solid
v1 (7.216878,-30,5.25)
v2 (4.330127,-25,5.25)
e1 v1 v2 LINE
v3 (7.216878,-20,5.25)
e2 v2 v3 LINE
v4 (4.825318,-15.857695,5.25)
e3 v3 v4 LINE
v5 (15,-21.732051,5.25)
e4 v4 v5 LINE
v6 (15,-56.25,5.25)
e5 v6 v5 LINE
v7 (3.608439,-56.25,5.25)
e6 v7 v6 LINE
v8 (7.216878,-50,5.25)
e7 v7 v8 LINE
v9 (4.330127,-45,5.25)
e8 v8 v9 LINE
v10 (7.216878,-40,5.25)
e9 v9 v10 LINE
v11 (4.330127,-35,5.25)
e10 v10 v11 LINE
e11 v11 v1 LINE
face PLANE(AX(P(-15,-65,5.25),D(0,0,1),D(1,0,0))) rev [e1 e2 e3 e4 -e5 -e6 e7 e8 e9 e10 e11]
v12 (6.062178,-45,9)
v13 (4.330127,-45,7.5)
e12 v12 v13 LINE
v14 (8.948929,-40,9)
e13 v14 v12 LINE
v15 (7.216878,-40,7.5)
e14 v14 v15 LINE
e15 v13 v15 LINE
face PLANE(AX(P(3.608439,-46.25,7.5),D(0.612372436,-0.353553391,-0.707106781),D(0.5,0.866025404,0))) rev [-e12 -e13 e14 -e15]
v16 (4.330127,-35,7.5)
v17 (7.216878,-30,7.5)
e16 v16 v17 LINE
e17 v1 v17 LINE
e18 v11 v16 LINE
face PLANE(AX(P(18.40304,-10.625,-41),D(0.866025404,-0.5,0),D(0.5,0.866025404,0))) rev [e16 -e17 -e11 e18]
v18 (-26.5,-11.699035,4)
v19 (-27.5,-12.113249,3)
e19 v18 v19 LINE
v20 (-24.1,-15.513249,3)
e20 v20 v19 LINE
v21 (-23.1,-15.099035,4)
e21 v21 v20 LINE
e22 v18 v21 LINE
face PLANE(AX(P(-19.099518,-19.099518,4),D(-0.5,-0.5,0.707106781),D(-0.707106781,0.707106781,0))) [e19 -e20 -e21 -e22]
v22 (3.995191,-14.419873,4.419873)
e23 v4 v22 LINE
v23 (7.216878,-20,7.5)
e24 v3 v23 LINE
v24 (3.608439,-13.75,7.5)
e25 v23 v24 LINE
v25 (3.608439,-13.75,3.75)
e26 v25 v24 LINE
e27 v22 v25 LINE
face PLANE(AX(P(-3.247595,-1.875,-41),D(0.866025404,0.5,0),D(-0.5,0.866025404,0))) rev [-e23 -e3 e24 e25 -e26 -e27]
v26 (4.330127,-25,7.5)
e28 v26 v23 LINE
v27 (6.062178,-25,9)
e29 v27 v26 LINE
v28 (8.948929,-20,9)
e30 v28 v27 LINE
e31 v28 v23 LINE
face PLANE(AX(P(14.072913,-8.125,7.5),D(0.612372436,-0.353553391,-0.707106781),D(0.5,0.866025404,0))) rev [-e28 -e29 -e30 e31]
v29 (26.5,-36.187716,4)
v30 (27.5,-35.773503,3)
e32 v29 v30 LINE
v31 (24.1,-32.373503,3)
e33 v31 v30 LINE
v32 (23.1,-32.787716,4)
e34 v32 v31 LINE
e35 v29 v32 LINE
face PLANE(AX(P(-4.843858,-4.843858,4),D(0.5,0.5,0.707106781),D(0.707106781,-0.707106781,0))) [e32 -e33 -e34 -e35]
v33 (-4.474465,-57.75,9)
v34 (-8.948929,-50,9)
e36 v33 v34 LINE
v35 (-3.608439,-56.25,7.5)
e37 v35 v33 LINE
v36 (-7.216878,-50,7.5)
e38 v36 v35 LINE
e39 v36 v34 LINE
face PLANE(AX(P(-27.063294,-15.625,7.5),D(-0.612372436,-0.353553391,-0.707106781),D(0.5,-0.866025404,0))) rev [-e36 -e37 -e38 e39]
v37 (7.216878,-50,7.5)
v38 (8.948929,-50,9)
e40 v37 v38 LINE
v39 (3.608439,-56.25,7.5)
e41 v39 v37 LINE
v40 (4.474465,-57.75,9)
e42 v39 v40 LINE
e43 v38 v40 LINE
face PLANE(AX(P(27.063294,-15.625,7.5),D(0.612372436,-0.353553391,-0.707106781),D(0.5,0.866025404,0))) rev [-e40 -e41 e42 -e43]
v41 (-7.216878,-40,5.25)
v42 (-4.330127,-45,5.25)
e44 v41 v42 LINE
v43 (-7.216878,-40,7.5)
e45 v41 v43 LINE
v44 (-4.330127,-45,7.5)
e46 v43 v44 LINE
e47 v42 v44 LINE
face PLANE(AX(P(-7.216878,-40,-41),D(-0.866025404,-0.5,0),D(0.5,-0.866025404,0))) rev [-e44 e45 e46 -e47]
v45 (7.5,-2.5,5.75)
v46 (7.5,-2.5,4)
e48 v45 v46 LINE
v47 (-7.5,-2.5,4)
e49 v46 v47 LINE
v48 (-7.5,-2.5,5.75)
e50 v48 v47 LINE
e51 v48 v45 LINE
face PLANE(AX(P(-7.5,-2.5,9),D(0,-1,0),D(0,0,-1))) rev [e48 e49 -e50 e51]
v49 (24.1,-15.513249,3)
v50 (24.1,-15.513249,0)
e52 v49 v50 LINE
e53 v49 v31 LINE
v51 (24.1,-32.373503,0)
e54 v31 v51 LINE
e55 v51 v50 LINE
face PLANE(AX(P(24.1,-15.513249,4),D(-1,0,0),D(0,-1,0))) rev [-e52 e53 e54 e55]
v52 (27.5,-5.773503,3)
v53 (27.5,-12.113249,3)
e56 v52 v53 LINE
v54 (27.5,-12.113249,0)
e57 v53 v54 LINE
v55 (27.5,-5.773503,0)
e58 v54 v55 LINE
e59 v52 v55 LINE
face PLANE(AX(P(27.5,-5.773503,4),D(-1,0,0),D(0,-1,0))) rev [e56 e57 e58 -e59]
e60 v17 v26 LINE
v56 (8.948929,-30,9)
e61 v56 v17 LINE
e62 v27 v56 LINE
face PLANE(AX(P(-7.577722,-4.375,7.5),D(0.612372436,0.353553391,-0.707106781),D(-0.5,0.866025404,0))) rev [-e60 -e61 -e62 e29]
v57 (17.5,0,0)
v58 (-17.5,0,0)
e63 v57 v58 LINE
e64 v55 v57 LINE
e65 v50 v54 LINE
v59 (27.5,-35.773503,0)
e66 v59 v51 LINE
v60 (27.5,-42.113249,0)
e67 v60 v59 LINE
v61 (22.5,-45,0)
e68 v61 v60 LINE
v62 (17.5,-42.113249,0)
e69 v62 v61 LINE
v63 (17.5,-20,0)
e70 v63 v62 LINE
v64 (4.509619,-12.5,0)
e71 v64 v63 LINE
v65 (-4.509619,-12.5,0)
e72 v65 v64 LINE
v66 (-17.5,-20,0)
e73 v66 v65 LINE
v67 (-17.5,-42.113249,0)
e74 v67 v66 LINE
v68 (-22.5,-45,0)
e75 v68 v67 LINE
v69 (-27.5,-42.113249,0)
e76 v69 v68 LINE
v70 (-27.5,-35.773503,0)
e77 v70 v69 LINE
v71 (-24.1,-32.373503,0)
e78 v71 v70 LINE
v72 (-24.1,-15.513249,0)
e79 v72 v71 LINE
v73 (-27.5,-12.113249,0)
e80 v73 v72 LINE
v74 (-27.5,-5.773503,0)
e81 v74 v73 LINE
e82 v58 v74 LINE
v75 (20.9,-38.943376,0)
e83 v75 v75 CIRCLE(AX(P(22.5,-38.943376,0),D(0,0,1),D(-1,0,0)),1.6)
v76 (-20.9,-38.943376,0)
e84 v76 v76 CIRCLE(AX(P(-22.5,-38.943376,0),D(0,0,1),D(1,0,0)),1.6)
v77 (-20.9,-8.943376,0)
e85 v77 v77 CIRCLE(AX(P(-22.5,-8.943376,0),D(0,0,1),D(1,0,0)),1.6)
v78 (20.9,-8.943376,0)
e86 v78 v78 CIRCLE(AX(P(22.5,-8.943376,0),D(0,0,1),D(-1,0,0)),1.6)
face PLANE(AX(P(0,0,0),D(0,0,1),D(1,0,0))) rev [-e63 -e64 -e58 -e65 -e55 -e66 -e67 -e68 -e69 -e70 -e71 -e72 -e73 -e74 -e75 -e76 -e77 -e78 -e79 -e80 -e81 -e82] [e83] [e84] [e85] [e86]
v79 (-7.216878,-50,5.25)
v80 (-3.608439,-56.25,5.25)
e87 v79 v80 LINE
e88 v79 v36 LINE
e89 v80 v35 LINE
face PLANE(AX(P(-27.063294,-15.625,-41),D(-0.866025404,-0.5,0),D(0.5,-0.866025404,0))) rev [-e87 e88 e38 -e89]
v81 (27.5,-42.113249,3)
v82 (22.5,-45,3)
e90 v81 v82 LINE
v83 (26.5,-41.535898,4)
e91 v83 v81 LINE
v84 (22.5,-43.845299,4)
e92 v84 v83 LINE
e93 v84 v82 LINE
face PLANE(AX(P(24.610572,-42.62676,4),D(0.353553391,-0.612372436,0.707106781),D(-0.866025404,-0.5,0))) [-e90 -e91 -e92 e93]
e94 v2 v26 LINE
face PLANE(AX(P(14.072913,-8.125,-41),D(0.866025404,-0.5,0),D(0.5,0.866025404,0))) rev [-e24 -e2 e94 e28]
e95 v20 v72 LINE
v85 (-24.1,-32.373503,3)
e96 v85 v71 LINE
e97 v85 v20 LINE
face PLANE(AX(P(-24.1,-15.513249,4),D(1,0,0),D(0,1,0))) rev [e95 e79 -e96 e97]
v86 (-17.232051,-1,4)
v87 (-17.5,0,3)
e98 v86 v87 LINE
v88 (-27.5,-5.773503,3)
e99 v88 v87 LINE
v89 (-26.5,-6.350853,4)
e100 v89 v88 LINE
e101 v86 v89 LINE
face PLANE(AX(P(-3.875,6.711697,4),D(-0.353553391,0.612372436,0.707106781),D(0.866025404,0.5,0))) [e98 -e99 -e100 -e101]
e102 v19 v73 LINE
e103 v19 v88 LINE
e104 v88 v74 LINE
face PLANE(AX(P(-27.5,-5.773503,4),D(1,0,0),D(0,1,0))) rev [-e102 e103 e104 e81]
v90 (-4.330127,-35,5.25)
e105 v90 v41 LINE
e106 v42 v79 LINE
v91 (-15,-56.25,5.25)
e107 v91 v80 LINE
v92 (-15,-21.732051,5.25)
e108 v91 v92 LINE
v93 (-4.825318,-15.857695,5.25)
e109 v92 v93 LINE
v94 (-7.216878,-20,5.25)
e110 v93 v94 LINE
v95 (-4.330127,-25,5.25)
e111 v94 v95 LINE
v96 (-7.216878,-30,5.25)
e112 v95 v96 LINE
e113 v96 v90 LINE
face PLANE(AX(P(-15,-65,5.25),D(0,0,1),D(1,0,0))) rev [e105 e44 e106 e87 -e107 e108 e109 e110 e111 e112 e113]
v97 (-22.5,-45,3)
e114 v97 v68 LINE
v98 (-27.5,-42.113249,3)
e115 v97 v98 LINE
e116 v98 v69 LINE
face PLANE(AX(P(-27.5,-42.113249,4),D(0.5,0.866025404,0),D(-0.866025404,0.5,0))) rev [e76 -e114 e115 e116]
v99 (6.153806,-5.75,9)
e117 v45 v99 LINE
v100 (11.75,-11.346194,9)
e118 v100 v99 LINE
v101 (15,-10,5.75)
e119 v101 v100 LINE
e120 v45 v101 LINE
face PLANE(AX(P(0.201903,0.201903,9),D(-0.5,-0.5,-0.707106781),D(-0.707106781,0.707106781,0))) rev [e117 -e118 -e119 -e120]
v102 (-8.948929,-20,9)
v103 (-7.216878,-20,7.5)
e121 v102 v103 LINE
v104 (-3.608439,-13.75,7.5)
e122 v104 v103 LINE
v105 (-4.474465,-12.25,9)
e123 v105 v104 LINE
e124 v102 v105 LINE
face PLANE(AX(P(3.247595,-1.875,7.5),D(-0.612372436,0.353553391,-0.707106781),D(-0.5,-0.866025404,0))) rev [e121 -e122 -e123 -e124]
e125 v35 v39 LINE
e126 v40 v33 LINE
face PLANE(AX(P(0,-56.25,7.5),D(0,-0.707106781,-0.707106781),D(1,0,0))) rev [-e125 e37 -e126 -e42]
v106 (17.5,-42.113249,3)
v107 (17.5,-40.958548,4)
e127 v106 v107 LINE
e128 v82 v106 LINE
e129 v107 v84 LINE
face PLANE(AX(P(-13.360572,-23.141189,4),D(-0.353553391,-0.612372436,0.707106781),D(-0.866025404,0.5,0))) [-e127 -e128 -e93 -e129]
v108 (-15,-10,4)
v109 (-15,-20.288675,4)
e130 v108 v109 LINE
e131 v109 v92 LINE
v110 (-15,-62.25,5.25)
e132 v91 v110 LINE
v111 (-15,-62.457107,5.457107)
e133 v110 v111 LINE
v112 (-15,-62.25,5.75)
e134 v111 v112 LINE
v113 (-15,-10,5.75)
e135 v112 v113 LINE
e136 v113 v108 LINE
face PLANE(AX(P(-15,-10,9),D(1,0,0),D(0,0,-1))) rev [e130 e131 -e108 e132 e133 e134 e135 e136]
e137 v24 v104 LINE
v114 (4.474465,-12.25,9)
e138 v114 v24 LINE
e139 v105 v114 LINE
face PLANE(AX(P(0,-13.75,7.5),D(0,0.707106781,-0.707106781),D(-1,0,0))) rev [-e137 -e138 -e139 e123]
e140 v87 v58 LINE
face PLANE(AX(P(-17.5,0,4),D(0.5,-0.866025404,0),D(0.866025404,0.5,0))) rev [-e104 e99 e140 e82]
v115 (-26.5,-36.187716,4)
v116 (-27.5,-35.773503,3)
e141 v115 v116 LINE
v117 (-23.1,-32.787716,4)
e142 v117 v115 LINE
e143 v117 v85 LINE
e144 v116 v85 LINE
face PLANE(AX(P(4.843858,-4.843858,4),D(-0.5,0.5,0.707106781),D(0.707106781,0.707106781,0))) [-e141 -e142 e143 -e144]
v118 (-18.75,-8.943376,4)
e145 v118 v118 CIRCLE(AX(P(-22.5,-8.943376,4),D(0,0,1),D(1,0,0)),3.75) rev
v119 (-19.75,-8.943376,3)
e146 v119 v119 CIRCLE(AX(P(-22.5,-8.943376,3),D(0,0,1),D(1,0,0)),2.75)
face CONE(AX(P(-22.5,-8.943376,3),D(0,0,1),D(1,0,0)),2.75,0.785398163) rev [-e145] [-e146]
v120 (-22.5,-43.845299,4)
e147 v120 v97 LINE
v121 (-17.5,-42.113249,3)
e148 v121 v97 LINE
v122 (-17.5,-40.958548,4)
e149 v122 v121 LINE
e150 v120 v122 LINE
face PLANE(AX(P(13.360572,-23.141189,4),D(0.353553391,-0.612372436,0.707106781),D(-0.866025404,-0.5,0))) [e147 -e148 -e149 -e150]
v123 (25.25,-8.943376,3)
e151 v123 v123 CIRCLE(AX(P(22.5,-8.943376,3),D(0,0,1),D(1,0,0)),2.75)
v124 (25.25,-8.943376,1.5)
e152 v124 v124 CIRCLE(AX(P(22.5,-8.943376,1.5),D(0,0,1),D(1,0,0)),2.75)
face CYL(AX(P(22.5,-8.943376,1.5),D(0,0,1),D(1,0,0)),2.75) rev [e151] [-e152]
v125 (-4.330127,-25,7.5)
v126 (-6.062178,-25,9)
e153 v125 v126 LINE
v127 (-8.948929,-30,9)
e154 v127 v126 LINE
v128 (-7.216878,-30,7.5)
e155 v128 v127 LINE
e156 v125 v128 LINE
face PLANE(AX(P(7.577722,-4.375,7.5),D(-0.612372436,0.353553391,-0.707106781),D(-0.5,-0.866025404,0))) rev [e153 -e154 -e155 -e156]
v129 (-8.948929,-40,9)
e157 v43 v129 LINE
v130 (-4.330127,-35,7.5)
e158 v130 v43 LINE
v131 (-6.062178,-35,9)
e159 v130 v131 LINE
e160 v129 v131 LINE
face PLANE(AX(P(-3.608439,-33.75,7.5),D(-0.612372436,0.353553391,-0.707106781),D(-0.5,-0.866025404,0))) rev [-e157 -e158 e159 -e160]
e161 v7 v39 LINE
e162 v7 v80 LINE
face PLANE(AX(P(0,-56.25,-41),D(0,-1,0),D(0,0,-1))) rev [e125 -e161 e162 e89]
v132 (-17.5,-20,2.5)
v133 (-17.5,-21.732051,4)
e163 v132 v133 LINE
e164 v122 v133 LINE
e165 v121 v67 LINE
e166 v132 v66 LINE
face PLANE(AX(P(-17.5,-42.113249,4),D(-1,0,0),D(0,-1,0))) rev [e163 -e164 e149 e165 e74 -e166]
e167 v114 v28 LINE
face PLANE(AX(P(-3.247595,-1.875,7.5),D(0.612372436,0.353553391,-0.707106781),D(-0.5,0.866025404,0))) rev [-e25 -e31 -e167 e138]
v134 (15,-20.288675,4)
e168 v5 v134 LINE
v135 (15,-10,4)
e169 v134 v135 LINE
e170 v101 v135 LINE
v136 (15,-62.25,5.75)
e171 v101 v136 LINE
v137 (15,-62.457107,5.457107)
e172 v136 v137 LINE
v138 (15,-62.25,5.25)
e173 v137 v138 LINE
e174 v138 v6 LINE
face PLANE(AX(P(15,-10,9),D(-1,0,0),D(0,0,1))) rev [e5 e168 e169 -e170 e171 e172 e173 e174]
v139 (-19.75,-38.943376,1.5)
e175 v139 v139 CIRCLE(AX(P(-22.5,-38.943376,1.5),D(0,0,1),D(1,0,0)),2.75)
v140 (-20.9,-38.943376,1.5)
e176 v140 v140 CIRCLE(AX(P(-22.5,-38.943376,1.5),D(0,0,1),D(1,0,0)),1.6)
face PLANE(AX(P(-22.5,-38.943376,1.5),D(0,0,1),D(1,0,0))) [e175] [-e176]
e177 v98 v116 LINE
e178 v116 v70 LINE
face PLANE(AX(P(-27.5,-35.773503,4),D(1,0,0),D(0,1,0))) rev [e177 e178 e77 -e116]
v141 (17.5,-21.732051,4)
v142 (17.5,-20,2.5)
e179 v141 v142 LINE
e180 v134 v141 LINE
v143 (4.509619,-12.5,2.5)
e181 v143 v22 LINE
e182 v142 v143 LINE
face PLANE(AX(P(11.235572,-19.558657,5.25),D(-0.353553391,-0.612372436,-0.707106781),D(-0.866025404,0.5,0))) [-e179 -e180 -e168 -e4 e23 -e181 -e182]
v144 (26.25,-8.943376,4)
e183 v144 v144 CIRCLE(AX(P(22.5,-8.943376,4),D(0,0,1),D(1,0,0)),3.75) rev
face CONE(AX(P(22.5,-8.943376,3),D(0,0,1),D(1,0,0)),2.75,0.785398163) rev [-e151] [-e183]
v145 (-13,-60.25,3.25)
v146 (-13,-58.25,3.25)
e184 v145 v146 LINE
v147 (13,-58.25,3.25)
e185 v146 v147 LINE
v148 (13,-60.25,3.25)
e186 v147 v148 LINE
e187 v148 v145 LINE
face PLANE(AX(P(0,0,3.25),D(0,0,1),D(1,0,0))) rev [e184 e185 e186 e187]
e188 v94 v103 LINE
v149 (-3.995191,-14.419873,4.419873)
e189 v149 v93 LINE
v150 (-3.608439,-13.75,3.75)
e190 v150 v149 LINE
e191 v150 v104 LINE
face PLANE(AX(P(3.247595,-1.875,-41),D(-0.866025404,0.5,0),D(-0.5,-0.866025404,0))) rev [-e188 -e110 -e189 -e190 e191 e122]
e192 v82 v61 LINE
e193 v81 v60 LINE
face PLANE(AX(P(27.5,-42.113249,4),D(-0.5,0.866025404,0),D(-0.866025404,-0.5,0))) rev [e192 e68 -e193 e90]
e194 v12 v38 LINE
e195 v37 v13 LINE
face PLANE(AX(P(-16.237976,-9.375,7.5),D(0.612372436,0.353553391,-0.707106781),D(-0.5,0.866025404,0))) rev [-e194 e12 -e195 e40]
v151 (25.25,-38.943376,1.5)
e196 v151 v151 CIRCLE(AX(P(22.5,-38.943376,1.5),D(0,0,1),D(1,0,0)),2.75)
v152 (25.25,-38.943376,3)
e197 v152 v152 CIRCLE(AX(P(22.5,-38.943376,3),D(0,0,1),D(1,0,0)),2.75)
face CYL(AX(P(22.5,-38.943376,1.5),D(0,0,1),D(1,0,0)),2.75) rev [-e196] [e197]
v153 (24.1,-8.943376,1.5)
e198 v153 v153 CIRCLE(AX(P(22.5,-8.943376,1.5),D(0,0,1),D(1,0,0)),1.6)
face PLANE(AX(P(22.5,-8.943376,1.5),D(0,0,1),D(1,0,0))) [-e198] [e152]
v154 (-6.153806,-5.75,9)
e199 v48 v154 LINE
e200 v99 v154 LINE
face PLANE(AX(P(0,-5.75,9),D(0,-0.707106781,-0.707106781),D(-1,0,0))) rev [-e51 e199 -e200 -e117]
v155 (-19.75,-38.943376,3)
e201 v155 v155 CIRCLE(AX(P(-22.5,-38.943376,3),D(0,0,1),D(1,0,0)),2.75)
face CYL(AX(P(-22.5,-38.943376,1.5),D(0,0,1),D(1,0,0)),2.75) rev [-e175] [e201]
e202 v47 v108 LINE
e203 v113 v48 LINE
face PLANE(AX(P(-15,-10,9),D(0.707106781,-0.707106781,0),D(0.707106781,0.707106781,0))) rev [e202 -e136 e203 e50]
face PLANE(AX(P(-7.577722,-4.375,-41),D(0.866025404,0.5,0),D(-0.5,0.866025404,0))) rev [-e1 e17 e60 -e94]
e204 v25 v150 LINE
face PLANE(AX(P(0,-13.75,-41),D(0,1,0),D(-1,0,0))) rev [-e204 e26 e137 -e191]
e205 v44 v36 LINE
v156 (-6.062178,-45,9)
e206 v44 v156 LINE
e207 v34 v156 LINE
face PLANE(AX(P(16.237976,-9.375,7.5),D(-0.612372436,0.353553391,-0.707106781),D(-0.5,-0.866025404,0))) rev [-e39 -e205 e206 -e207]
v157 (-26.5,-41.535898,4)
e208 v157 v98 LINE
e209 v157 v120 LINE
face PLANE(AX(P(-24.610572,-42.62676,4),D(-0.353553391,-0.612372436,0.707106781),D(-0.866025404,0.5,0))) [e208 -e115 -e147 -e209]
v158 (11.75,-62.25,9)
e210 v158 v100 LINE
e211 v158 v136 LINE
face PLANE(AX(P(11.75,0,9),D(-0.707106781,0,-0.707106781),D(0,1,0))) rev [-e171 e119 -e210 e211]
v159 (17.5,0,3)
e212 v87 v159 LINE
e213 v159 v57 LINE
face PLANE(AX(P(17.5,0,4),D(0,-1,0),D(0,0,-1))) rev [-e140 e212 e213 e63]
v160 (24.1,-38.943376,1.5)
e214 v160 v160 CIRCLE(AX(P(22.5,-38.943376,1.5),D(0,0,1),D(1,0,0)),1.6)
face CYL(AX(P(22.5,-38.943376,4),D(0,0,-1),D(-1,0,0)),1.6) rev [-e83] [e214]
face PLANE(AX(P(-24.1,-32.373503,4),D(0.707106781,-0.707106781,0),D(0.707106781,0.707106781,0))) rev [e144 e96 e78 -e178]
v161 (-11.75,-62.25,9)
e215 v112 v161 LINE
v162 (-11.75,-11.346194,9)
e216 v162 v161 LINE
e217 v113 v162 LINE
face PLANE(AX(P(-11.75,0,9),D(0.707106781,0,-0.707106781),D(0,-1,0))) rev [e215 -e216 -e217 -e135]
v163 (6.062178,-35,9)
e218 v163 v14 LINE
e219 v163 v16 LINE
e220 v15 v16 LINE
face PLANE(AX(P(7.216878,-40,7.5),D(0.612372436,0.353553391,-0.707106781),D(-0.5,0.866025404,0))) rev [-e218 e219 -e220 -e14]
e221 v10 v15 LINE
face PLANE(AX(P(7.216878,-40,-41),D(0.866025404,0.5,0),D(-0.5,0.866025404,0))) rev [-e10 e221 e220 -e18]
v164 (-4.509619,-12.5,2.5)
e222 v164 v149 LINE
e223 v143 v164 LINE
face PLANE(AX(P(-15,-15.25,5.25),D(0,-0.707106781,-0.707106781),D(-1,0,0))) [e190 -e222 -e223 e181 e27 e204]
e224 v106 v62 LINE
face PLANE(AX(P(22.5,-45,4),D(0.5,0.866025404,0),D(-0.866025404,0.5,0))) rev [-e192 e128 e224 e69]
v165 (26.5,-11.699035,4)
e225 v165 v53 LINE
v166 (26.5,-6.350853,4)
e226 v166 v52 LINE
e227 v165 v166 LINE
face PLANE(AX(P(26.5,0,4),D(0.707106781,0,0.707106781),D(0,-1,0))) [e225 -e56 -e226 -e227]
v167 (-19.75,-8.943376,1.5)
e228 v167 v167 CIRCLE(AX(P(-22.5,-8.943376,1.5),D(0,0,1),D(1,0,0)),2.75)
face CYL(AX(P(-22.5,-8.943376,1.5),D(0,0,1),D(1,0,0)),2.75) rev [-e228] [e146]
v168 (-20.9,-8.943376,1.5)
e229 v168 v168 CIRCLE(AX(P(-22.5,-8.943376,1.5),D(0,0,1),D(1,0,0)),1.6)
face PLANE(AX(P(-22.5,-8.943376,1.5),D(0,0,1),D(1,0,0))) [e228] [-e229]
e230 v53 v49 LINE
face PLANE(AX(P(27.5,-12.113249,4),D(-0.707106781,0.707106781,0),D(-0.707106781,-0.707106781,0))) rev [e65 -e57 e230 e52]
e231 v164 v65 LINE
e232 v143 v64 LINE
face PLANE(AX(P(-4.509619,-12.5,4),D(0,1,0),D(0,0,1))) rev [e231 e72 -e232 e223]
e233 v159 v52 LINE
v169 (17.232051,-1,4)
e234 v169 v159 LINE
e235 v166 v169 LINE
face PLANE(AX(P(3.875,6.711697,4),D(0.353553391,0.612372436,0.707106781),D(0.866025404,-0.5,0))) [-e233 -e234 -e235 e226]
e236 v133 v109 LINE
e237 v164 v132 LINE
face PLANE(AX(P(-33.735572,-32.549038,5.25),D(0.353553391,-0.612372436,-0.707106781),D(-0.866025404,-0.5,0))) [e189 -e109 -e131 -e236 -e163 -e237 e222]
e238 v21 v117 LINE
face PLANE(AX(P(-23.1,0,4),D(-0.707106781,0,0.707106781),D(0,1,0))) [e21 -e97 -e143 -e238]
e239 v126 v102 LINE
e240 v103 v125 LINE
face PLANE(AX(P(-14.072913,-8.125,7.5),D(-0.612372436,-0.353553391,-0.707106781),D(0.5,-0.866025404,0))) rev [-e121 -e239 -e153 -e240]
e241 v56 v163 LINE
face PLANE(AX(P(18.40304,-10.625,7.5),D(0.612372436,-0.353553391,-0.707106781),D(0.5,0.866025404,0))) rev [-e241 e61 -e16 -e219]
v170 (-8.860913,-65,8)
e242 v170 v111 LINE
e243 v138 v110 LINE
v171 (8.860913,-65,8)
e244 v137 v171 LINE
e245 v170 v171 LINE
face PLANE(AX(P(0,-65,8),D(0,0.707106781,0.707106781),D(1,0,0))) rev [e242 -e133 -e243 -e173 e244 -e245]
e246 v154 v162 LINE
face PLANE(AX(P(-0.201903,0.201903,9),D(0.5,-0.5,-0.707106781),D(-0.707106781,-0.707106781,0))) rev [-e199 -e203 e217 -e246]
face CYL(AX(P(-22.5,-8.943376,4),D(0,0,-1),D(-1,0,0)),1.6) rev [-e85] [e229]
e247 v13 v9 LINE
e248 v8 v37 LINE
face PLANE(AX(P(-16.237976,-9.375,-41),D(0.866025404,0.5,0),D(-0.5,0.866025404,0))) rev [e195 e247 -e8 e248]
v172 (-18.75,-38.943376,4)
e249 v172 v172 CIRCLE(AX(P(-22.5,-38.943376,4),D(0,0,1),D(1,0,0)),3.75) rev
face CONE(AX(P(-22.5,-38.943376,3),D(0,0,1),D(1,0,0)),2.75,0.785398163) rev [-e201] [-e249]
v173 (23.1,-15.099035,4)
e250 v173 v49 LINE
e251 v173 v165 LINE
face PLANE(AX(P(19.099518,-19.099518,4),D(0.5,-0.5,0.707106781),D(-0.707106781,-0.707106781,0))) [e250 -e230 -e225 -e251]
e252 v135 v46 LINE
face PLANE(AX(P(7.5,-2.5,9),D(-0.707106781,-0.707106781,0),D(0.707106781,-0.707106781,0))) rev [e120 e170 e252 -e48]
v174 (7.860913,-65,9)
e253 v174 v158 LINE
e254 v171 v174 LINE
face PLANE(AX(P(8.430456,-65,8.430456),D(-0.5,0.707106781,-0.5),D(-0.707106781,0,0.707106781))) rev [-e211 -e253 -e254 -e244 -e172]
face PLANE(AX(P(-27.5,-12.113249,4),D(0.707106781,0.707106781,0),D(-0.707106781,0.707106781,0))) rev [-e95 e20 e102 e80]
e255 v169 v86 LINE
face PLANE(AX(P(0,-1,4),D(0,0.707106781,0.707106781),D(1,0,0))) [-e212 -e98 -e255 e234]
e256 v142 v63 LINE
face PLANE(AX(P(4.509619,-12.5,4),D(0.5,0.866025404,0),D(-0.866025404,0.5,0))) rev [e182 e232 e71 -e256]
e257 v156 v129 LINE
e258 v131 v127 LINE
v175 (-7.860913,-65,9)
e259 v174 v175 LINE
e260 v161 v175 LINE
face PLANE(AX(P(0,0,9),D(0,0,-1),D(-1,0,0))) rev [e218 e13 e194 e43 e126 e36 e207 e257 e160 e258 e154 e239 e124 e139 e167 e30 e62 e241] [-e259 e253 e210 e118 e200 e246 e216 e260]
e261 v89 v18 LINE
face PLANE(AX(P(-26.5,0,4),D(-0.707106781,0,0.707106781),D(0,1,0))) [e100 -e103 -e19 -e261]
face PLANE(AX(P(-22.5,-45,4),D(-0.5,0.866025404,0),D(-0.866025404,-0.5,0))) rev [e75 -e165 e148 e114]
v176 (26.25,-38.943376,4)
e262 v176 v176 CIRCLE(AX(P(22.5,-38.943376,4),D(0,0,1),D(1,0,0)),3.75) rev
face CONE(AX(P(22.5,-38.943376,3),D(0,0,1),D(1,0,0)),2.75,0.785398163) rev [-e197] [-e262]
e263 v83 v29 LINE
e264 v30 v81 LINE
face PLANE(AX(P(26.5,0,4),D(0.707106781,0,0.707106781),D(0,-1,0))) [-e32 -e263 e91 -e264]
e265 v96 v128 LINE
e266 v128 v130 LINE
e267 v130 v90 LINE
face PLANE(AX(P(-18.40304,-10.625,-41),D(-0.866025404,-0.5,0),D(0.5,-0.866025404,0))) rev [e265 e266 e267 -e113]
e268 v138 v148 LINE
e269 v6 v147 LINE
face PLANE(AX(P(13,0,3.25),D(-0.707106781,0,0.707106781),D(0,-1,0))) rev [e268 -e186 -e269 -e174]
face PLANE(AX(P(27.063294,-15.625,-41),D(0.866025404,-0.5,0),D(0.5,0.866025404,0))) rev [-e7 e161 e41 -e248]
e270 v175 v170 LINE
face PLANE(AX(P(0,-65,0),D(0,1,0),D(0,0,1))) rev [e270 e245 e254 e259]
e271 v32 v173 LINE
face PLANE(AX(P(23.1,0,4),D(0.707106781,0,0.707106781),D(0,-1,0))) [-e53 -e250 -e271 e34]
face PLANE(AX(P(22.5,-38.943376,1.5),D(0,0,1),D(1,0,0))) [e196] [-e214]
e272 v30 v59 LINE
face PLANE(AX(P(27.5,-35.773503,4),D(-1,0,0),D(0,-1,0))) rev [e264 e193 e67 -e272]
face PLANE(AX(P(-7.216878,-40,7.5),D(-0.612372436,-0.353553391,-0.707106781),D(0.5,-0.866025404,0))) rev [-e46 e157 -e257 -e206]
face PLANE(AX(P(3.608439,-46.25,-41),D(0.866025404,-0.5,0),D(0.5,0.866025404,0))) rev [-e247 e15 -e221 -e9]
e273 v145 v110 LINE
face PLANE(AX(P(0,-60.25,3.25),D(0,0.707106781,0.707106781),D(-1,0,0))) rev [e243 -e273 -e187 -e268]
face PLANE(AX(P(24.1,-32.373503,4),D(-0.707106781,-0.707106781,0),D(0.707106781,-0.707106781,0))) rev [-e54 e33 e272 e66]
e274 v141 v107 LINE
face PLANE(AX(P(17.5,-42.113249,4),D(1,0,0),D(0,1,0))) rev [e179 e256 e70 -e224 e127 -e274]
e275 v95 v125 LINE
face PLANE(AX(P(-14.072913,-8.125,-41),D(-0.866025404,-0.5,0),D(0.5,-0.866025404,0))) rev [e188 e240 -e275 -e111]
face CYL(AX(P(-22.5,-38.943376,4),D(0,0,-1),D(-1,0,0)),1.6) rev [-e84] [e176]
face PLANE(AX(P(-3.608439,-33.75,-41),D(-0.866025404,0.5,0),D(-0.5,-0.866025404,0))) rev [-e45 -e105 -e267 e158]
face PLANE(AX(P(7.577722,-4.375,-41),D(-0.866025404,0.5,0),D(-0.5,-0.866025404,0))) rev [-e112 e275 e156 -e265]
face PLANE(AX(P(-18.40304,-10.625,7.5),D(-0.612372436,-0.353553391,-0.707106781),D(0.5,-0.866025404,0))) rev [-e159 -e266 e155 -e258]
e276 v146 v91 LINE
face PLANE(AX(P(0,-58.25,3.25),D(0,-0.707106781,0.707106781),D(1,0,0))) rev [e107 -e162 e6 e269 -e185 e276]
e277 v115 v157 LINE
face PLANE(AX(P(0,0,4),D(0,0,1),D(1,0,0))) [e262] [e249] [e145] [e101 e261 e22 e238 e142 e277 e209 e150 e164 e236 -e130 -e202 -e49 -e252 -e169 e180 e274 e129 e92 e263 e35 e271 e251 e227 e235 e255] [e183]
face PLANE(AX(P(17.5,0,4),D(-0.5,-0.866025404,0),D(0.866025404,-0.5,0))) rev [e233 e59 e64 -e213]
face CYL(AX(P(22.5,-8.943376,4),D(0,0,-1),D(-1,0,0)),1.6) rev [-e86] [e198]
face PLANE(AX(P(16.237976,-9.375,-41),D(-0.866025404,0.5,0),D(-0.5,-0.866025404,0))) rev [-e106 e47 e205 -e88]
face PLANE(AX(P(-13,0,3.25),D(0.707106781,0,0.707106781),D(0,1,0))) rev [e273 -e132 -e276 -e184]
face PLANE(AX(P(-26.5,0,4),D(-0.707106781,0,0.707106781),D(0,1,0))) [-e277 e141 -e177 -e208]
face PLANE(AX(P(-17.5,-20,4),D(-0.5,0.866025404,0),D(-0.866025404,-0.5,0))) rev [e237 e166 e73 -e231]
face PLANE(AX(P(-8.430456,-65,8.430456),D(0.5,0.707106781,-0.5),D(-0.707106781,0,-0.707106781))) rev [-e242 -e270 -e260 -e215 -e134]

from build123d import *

# Parameters (mm, degrees)
SKETCH1_R           = 1.6
BOSS_EXTRUDE1_DEPTH = 4
SKETCH2_R           = 2.75
CUT_EXTRUDE1_DEPTH  = 2.5
CHAMFER1_SIZE       = 1
BOSS_EXTRUDE2_DEPTH = 5
CHAMFER2_SIZE       = 3.25
BOSS_EXTRUDE3_DEPTH = 52.5
CHAMFER3_SIZE       = 2.75
CUT_EXTRUDE3_DEPTH  = 50
CHAMFER4_SIZE       = 1.5
SKETCH6_W           = 30
SKETCH6_H           = 6
BOSS_EXTRUDE4_DEPTH = 2
CHAMFER5_SIZE       = 2


# Some blends are built 0.0001 mm under size
with BuildPart() as part:
    # Sketch1 → Boss-Extrude1 (new body)
    with BuildSketch(Plane.XY):
        Polygon((17.5, 0), (-17.5, 0), (-27.5, -5.773502692), (-27.5, -12.113248654), (-24.1, -15.513248654), (-24.1, -32.373502692), (-27.5, -35.773502692), (-27.5, -42.113248654), (-22.5, -45), (-17.5, -42.113248654), (-17.5, -20), (-4.509618943, -12.5), (4.509618943, -12.5), (17.5, -20), (17.5, -42.113248654), (22.5, -45), (27.5, -42.113248654), (27.5, -35.773502692), (24.1, -32.373502692), (24.1, -15.513248654), (27.5, -12.113248654), (27.5, -5.773502692), align=None)
        with Locations((-22.5, -8.943375673)):
            Circle(SKETCH1_R, mode=Mode.SUBTRACT)
        with Locations((-22.5, -38.943375673)):
            Circle(SKETCH1_R, mode=Mode.SUBTRACT)
        with Locations(Location((22.5, -38.943375673, 0), (0, 0, 180))):
            Circle(SKETCH1_R, mode=Mode.SUBTRACT)
        with Locations(Location((22.5, -8.943375673, 0), (0, 0, 180))):
            Circle(SKETCH1_R, mode=Mode.SUBTRACT)
    extrude(amount=BOSS_EXTRUDE1_DEPTH)

    # Sketch2 → Cut-Extrude1 (cut)
    with BuildSketch(Plane.XY.offset(4)):
        with Locations((-22.5, -8.943375673)):
            Circle(SKETCH2_R)
        with Locations((22.5, -8.943375673)):
            Circle(SKETCH2_R)
        with Locations((22.5, -38.943375673)):
            Circle(SKETCH2_R)
        with Locations((-22.5, -38.943375673)):
            Circle(SKETCH2_R)
    extrude(amount=-CUT_EXTRUDE1_DEPTH, mode=Mode.SUBTRACT)

    # Chamfer1
    chamfer1_edges = [part.edges().sort_by_distance(p)[0] for p in [
        (-25.8, -13.813248654, 4),
        (-24.1, -23.943375673, 4),
        (-25.8, -34.073502692, 4),
        (-27.5, -38.943375673, 4),
        (-25, -43.556624327, 4),
        (-20, -43.556624327, 4),
        (-22.5, -2.886751346, 4),
        (20, -43.556624327, 4),
        (25, -43.556624327, 4),
        (27.5, -38.943375673, 4),
        (25.8, -34.073502692, 4),
        (24.1, -23.943375673, 4),
        (25.8, -13.813248654, 4),
        (27.5, -8.943375673, 4),
        (22.5, -2.886751346, 4),
        (-25.25, -38.943375673, 4),
        (0, 0, 4),
        (-27.5, -8.943375673, 4),
        (19.75, -38.943375673, 4),
        (19.75, -8.943375673, 4),
        (-25.25, -8.943375673, 4),
    ]]
    chamfer(chamfer1_edges, length=CHAMFER1_SIZE)

    # Sketch3 → Boss-Extrude2 (add)
    with BuildSketch(Plane.XY.offset(4)):
        Polygon((-7.5, -2.5), (7.5, -2.5), (15, -10), (15, -18.556624327), (4.509618943, -12.5), (-4.509618943, -12.5), (-15, -18.556624327), (-15, -10), align=None)
    extrude(amount=BOSS_EXTRUDE2_DEPTH)

    # Chamfer2
    chamfer2_edges = [part.edges().sort_by_distance(p)[0] for p in [
        (-11.25, -6.25, 9),
        (-15, -14.278312164, 9),
        (15, -14.278312164, 9),
        (11.25, -6.25, 9),
        (0, -2.5, 9),
    ]]
    chamfer(chamfer2_edges, length=CHAMFER2_SIZE)

    # Sketch4 → Boss-Extrude3 (add)
    with BuildSketch(Plane.XZ.offset(12.5)):
        Polygon((-11.75, 9), (-15, 5.75), (-15, 5.25), (15, 5.25), (15, 5.75), (11.75, 9), (4.509618943, 9), (-4.509618943, 9), align=None)
    extrude(amount=BOSS_EXTRUDE3_DEPTH)

    # Chamfer3
    # the kernel refuses this chamfer: 2.75 mm, written as the material it adds along each edge
    with BuildSketch(Plane(origin=(-21.124642695, -22.092688435, 5.25), x_dir=(-0.01374793830529312, 0.02381212764408999, -0.9996219169112968), z_dir=(0.8660254037844382, 0.500000000000001, 0))) as chamfer3_piece_1_section:
        Polygon((CHAMFER3_SIZE * 0.999621916911, -CHAMFER3_SIZE * 0.0274958766106), (-CHAMFER3_SIZE * 0.0274958766106, -CHAMFER3_SIZE * 0.999621916911), (0, 0), align=None)
    chamfer3_piece_1 = extrude(amount=26.257505088, mode=Mode.PRIVATE)
    chamfer3_piece_1 = split(chamfer3_piece_1, bisect_by=Plane(origin=(-17.954336586, -20.761071598, 4), z_dir=(0, 0, -1)), keep=Keep.TOP, mode=Mode.PRIVATE)
    chamfer3_piece_1 = split(chamfer3_piece_1, bisect_by=Plane(origin=(-15, -20.761071598, 3.452040033), z_dir=(-1, 0, 0)), keep=Keep.TOP, mode=Mode.PRIVATE)
    add(chamfer3_piece_1)
    with BuildSketch(Plane(origin=(-21.124642695, -22.092688435, 5.25), x_dir=(-0.01374793830529312, 0.02381212764408999, -0.9996219169112968), z_dir=(0.8660254037844382, 0.500000000000001, 0))) as chamfer3_piece_2_section:
        Polygon((CHAMFER3_SIZE * 0.999621916911, -CHAMFER3_SIZE * 0.0274958766106), (-CHAMFER3_SIZE * 0.0274958766106, -CHAMFER3_SIZE * 0.999621916911), (0, 0), align=None)
    chamfer3_piece_2 = extrude(amount=26.257505088, mode=Mode.PRIVATE)
    chamfer3_piece_2 = split(chamfer3_piece_2, bisect_by=Plane(origin=(-9.286470949, -15.798707536, 4), z_dir=(0, 0, -1)), keep=Keep.TOP, mode=Mode.PRIVATE)
    chamfer3_piece_2 = split(chamfer3_piece_2, bisect_by=Plane(origin=(-9.286470949, -12.5, 3.472082551), z_dir=(0, -1, 0)), keep=Keep.TOP, mode=Mode.PRIVATE)
    chamfer3_piece_2 = split(chamfer3_piece_2, bisect_by=Plane(origin=(-15, -15.798707536, 3.472082551), z_dir=(1, 0, 0)), keep=Keep.TOP, mode=Mode.PRIVATE)
    add(chamfer3_piece_2)
    with BuildSketch(Plane(origin=(-21.124642695, -22.092688435, 5.25), x_dir=(-0.01374793830529312, 0.02381212764408999, -0.9996219169112968), z_dir=(0.8660254037844382, 0.500000000000001, 0))) as chamfer3_piece_3_section:
        Polygon((CHAMFER3_SIZE * 0.999621916911, -CHAMFER3_SIZE * 0.0274958766106), (-CHAMFER3_SIZE * 0.0274958766106, -CHAMFER3_SIZE * 0.999621916911), (0, 0), align=None)
    chamfer3_piece_3 = extrude(amount=26.257505088, mode=Mode.PRIVATE)
    chamfer3_piece_3 = split(chamfer3_piece_3, bisect_by=Plane(origin=(-8.570164938, -16.212267004, 4), z_dir=(0, 0, 1)), keep=Keep.TOP, mode=Mode.PRIVATE)
    chamfer3_piece_3 = split(chamfer3_piece_3, bisect_by=Plane(origin=(-8.570164938, -12.5, 4.737501352), z_dir=(0, -1, 0)), keep=Keep.TOP, mode=Mode.PRIVATE)
    chamfer3_piece_3 = split(chamfer3_piece_3, bisect_by=Plane(origin=(-15, -16.212267004, 4.737501352), z_dir=(1, 0, 0)), keep=Keep.TOP, mode=Mode.PRIVATE)
    add(chamfer3_piece_3)
    with BuildSketch(Plane(origin=(-21.124642695, -22.092688435, 5.25), x_dir=(-0.01374793830529312, 0.02381212764408999, -0.9996219169112968), z_dir=(0.8660254037844382, 0.500000000000001, 0))) as chamfer3_piece_4_section:
        Polygon((CHAMFER3_SIZE * 0.999621916911, -CHAMFER3_SIZE * 0.0274958766106), (-CHAMFER3_SIZE * 0.0274958766106, -CHAMFER3_SIZE * 0.999621916911), (0, 0), align=None)
    chamfer3_piece_4 = extrude(amount=26.257505088, mode=Mode.PRIVATE)
    chamfer3_piece_4 = split(chamfer3_piece_4, bisect_by=Plane(origin=(-0.9405737, -10.907502252, 4), z_dir=(0, 0, -1)), keep=Keep.TOP, mode=Mode.PRIVATE)
    chamfer3_piece_4 = split(chamfer3_piece_4, bisect_by=Plane(origin=(-0.9405737, -12.5, 3.437415432), z_dir=(0, 1, 0)), keep=Keep.TOP, mode=Mode.PRIVATE)
    add(chamfer3_piece_4)
    with BuildSketch(Plane(origin=(-21.124642695, -22.092688435, 5.25), x_dir=(-0.01374793830529312, 0.02381212764408999, -0.9996219169112968), z_dir=(0.8660254037844382, 0.500000000000001, 0))) as chamfer3_piece_5_section:
        Polygon((CHAMFER3_SIZE * 0.999621916911, -CHAMFER3_SIZE * 0.0274958766106), (-CHAMFER3_SIZE * 0.0274958766106, -CHAMFER3_SIZE * 0.999621916911), (0, 0), align=None)
    chamfer3_piece_5 = extrude(amount=26.257505088, mode=Mode.PRIVATE)
    chamfer3_piece_5 = split(chamfer3_piece_5, bisect_by=Plane(origin=(-0.271585023, -11.139246728, 4), z_dir=(0, 0, 1)), keep=Keep.TOP, mode=Mode.PRIVATE)
    chamfer3_piece_5 = split(chamfer3_piece_5, bisect_by=Plane(origin=(-0.271585023, -12.5, 4.697391436), z_dir=(0, 1, 0)), keep=Keep.TOP, mode=Mode.PRIVATE)
    add(chamfer3_piece_5)
    with BuildSketch(Plane(origin=(-1.615023751, -8.963935892, 5.25), x_dir=(0.013747938305293148, 0.023812127644090013, -0.9996219169112968), z_dir=(0.8660254037844379, -0.5000000000000013, 0))) as chamfer3_piece_6_section:
        Polygon((CHAMFER3_SIZE * 0.999621916911, -CHAMFER3_SIZE * 0.0274958766106), (-CHAMFER3_SIZE * 0.0274958766106, -CHAMFER3_SIZE * 0.999621916911), (0, 0), align=None)
    chamfer3_piece_6 = extrude(amount=26.257505088, mode=Mode.PRIVATE)
    chamfer3_piece_6 = split(chamfer3_piece_6, bisect_by=Plane(origin=(0.9405737, -12.5, 3.437415432), z_dir=(0, 1, 0)), keep=Keep.TOP, mode=Mode.PRIVATE)
    chamfer3_piece_6 = split(chamfer3_piece_6, bisect_by=Plane(origin=(0.9405737, -10.907502252, 4), z_dir=(0, 0, -1)), keep=Keep.TOP, mode=Mode.PRIVATE)
    add(chamfer3_piece_6)
    with BuildSketch(Plane(origin=(-1.615023751, -8.963935892, 5.25), x_dir=(0.013747938305293148, 0.023812127644090013, -0.9996219169112968), z_dir=(0.8660254037844379, -0.5000000000000013, 0))) as chamfer3_piece_7_section:
        Polygon((CHAMFER3_SIZE * 0.999621916911, -CHAMFER3_SIZE * 0.0274958766106), (-CHAMFER3_SIZE * 0.0274958766106, -CHAMFER3_SIZE * 0.999621916911), (0, 0), align=None)
    chamfer3_piece_7 = extrude(amount=26.257505088, mode=Mode.PRIVATE)
    chamfer3_piece_7 = split(chamfer3_piece_7, bisect_by=Plane(origin=(0.271585023, -12.5, 4.697391436), z_dir=(0, 1, 0)), keep=Keep.TOP, mode=Mode.PRIVATE)
    chamfer3_piece_7 = split(chamfer3_piece_7, bisect_by=Plane(origin=(0.271585023, -11.139246728, 4), z_dir=(0, 0, 1)), keep=Keep.TOP, mode=Mode.PRIVATE)
    add(chamfer3_piece_7)
    with BuildSketch(Plane(origin=(-1.615023751, -8.963935892, 5.25), x_dir=(0.013747938305293148, 0.023812127644090013, -0.9996219169112968), z_dir=(0.8660254037844379, -0.5000000000000013, 0))) as chamfer3_piece_8_section:
        Polygon((CHAMFER3_SIZE * 0.999621916911, -CHAMFER3_SIZE * 0.0274958766106), (-CHAMFER3_SIZE * 0.0274958766106, -CHAMFER3_SIZE * 0.999621916911), (0, 0), align=None)
    chamfer3_piece_8 = extrude(amount=26.257505088, mode=Mode.PRIVATE)
    chamfer3_piece_8 = split(chamfer3_piece_8, bisect_by=Plane(origin=(15, -15.798707536, 3.472082551), z_dir=(-1, 0, 0)), keep=Keep.TOP, mode=Mode.PRIVATE)
    chamfer3_piece_8 = split(chamfer3_piece_8, bisect_by=Plane(origin=(9.286470949, -12.5, 3.472082551), z_dir=(0, -1, 0)), keep=Keep.TOP, mode=Mode.PRIVATE)
    chamfer3_piece_8 = split(chamfer3_piece_8, bisect_by=Plane(origin=(9.286470949, -15.798707536, 4), z_dir=(0, 0, -1)), keep=Keep.TOP, mode=Mode.PRIVATE)
    add(chamfer3_piece_8)
    with BuildSketch(Plane(origin=(-1.615023751, -8.963935892, 5.25), x_dir=(0.013747938305293148, 0.023812127644090013, -0.9996219169112968), z_dir=(0.8660254037844379, -0.5000000000000013, 0))) as chamfer3_piece_9_section:
        Polygon((CHAMFER3_SIZE * 0.999621916911, -CHAMFER3_SIZE * 0.0274958766106), (-CHAMFER3_SIZE * 0.0274958766106, -CHAMFER3_SIZE * 0.999621916911), (0, 0), align=None)
    chamfer3_piece_9 = extrude(amount=26.257505088, mode=Mode.PRIVATE)
    chamfer3_piece_9 = split(chamfer3_piece_9, bisect_by=Plane(origin=(15, -16.212267004, 4.737501352), z_dir=(-1, 0, 0)), keep=Keep.TOP, mode=Mode.PRIVATE)
    chamfer3_piece_9 = split(chamfer3_piece_9, bisect_by=Plane(origin=(8.570164938, -12.5, 4.737501352), z_dir=(0, -1, 0)), keep=Keep.TOP, mode=Mode.PRIVATE)
    chamfer3_piece_9 = split(chamfer3_piece_9, bisect_by=Plane(origin=(8.570164938, -16.212267004, 4), z_dir=(0, 0, 1)), keep=Keep.TOP, mode=Mode.PRIVATE)
    add(chamfer3_piece_9)
    with BuildSketch(Plane(origin=(-1.615023751, -8.963935892, 5.25), x_dir=(0.013747938305293148, 0.023812127644090013, -0.9996219169112968), z_dir=(0.8660254037844379, -0.5000000000000013, 0))) as chamfer3_piece_10_section:
        Polygon((CHAMFER3_SIZE * 0.999621916911, -CHAMFER3_SIZE * 0.0274958766106), (-CHAMFER3_SIZE * 0.0274958766106, -CHAMFER3_SIZE * 0.999621916911), (0, 0), align=None)
    chamfer3_piece_10 = extrude(amount=26.257505088, mode=Mode.PRIVATE)
    chamfer3_piece_10 = split(chamfer3_piece_10, bisect_by=Plane(origin=(15, -20.761071598, 3.452040033), z_dir=(1, 0, 0)), keep=Keep.TOP, mode=Mode.PRIVATE)
    chamfer3_piece_10 = split(chamfer3_piece_10, bisect_by=Plane(origin=(17.954336586, -20.761071598, 4), z_dir=(0, 0, -1)), keep=Keep.TOP, mode=Mode.PRIVATE)
    add(chamfer3_piece_10)
    with BuildSketch(Plane(origin=(-11.58174716, -12.5, 5.25), x_dir=(0, -0.9996219169112968, 0.02749587661058625), z_dir=(1, 0, 0))) as chamfer3_piece_11:
        Polygon((CHAMFER3_SIZE * 0.999621916911, CHAMFER3_SIZE * 0.0274958766106), (-CHAMFER3_SIZE * 0.0274958766106, CHAMFER3_SIZE * 0.999621916911), (0, 0), align=None)
    extrude(amount=23.16349432)
    # the kernel refuses this chamfer: 2.75 mm, written as the material it takes off along each edge
    with BuildSketch(Plane(origin=(20.00074982, -65, 0.74925018), x_dir=(0.019442520806014035, 0.9996219169112968, 0.019442520806013917), z_dir=(-0.7071067811865454, 0, 0.7071067811865497))) as chamfer3_2_piece_1:
        Polygon((CHAMFER3_SIZE * 0.999621916911, CHAMFER3_SIZE * 0.0274958766106), (-CHAMFER3_SIZE * 0.0274958766106, CHAMFER3_SIZE * 0.999621916911), (0, 0), align=None)
    extrude(amount=18.740450512, mode=Mode.SUBTRACT)
    with BuildSketch(Plane(origin=(-22.072128217, -65, 5.25), x_dir=(0, -0.027495876610587187, 0.9996219169112966), z_dir=(1, 0, 0))) as chamfer3_2_piece_2:
        Polygon((CHAMFER3_SIZE * 0.999621916911, -CHAMFER3_SIZE * 0.0274958766106), (-CHAMFER3_SIZE * 0.0274958766106, -CHAMFER3_SIZE * 0.999621916911), (0, 0), align=None)
    extrude(amount=44.144256434, mode=Mode.SUBTRACT)
    with BuildSketch(Plane(origin=(-6.74925018, -65, 14.00074982), x_dir=(0.7068394360706757, -0.027495876610587198, -0.7068394360706712), z_dir=(-0.7071067811865454, 0, -0.7071067811865497))) as chamfer3_2_piece_3:
        Polygon((CHAMFER3_SIZE * 0.999621916911, -CHAMFER3_SIZE * 0.0274958766106), (-CHAMFER3_SIZE * 0.0274958766106, -CHAMFER3_SIZE * 0.999621916911), (0, 0), align=None)
    extrude(amount=18.740450512, mode=Mode.SUBTRACT)

    # Sketch5 → Cut-Extrude3 (cut)
    with BuildSketch(Plane.XY.offset(9)):
        Polygon((7.216878365, -30), (3.608439182, -23.75), (-3.608439182, -23.75), (-7.216878365, -30), (-3.608439182, -36.25), (3.608439182, -36.25), align=None)
        Polygon((7.216878365, -20), (3.608439182, -13.75), (-3.608439182, -13.75), (-7.216878365, -20), (-3.608439182, -26.25), (3.608439182, -26.25), align=None)
        Polygon((7.216878365, -40), (3.608439182, -33.75), (-3.608439182, -33.75), (-7.216878365, -40), (-3.608439182, -46.25), (3.608439182, -46.25), align=None)
        Polygon((7.216878365, -50), (3.608439182, -43.75), (-3.608439182, -43.75), (-7.216878365, -50), (-3.608439182, -56.25), (3.608439182, -56.25), align=None)
    extrude(amount=-CUT_EXTRUDE3_DEPTH, mode=Mode.SUBTRACT)

    # Chamfer4
    chamfer4_edges = [part.edges().sort_by_distance(p)[0] for p in [
        (5.773502692, -47.5, 9),
        (5.773502692, -42.5, 9),
        (5.773502692, -37.5, 9),
        (5.773502692, -32.5, 9),
        (5.773502692, -27.5, 9),
        (5.773502692, -22.5, 9),
        (5.412658774, -16.875, 9),
        (0, -13.75, 9),
        (-5.412658774, -16.875, 9),
        (-5.773502692, -22.5, 9),
        (-5.773502692, -27.5, 9),
        (-5.773502692, -32.5, 9),
        (-5.773502692, -37.5, 9),
        (-5.773502692, -42.5, 9),
        (-5.773502692, -47.5, 9),
        (-5.412658774, -53.125, 9),
        (0, -56.25, 9),
        (5.412658774, -53.125, 9),
    ]]
    chamfer(chamfer4_edges, length=CHAMFER4_SIZE)

    # Sketch6 → Boss-Extrude4 (add)
    with BuildSketch(Plane(origin=(0, 0, 5.25), x_dir=(-1, 0, 0), z_dir=(0, 0, -1))):
        with Locations((0, -59.25)):
            Rectangle(SKETCH6_W, SKETCH6_H)
    extrude(amount=BOSS_EXTRUDE4_DEPTH)

    # Chamfer5
    chamfer5_edges = [part.edges().sort_by_distance(p)[0] for p in [
        (0, -56.25, 3.25),
        (-15, -59.25, 3.25),
        (0, -62.25, 3.25),
        (15, -59.25, 3.25),
    ]]
    chamfer(chamfer5_edges, length=CHAMFER5_SIZE - 0.0001)  # a hair under: the kernel refuses the full size


solid = part.part
